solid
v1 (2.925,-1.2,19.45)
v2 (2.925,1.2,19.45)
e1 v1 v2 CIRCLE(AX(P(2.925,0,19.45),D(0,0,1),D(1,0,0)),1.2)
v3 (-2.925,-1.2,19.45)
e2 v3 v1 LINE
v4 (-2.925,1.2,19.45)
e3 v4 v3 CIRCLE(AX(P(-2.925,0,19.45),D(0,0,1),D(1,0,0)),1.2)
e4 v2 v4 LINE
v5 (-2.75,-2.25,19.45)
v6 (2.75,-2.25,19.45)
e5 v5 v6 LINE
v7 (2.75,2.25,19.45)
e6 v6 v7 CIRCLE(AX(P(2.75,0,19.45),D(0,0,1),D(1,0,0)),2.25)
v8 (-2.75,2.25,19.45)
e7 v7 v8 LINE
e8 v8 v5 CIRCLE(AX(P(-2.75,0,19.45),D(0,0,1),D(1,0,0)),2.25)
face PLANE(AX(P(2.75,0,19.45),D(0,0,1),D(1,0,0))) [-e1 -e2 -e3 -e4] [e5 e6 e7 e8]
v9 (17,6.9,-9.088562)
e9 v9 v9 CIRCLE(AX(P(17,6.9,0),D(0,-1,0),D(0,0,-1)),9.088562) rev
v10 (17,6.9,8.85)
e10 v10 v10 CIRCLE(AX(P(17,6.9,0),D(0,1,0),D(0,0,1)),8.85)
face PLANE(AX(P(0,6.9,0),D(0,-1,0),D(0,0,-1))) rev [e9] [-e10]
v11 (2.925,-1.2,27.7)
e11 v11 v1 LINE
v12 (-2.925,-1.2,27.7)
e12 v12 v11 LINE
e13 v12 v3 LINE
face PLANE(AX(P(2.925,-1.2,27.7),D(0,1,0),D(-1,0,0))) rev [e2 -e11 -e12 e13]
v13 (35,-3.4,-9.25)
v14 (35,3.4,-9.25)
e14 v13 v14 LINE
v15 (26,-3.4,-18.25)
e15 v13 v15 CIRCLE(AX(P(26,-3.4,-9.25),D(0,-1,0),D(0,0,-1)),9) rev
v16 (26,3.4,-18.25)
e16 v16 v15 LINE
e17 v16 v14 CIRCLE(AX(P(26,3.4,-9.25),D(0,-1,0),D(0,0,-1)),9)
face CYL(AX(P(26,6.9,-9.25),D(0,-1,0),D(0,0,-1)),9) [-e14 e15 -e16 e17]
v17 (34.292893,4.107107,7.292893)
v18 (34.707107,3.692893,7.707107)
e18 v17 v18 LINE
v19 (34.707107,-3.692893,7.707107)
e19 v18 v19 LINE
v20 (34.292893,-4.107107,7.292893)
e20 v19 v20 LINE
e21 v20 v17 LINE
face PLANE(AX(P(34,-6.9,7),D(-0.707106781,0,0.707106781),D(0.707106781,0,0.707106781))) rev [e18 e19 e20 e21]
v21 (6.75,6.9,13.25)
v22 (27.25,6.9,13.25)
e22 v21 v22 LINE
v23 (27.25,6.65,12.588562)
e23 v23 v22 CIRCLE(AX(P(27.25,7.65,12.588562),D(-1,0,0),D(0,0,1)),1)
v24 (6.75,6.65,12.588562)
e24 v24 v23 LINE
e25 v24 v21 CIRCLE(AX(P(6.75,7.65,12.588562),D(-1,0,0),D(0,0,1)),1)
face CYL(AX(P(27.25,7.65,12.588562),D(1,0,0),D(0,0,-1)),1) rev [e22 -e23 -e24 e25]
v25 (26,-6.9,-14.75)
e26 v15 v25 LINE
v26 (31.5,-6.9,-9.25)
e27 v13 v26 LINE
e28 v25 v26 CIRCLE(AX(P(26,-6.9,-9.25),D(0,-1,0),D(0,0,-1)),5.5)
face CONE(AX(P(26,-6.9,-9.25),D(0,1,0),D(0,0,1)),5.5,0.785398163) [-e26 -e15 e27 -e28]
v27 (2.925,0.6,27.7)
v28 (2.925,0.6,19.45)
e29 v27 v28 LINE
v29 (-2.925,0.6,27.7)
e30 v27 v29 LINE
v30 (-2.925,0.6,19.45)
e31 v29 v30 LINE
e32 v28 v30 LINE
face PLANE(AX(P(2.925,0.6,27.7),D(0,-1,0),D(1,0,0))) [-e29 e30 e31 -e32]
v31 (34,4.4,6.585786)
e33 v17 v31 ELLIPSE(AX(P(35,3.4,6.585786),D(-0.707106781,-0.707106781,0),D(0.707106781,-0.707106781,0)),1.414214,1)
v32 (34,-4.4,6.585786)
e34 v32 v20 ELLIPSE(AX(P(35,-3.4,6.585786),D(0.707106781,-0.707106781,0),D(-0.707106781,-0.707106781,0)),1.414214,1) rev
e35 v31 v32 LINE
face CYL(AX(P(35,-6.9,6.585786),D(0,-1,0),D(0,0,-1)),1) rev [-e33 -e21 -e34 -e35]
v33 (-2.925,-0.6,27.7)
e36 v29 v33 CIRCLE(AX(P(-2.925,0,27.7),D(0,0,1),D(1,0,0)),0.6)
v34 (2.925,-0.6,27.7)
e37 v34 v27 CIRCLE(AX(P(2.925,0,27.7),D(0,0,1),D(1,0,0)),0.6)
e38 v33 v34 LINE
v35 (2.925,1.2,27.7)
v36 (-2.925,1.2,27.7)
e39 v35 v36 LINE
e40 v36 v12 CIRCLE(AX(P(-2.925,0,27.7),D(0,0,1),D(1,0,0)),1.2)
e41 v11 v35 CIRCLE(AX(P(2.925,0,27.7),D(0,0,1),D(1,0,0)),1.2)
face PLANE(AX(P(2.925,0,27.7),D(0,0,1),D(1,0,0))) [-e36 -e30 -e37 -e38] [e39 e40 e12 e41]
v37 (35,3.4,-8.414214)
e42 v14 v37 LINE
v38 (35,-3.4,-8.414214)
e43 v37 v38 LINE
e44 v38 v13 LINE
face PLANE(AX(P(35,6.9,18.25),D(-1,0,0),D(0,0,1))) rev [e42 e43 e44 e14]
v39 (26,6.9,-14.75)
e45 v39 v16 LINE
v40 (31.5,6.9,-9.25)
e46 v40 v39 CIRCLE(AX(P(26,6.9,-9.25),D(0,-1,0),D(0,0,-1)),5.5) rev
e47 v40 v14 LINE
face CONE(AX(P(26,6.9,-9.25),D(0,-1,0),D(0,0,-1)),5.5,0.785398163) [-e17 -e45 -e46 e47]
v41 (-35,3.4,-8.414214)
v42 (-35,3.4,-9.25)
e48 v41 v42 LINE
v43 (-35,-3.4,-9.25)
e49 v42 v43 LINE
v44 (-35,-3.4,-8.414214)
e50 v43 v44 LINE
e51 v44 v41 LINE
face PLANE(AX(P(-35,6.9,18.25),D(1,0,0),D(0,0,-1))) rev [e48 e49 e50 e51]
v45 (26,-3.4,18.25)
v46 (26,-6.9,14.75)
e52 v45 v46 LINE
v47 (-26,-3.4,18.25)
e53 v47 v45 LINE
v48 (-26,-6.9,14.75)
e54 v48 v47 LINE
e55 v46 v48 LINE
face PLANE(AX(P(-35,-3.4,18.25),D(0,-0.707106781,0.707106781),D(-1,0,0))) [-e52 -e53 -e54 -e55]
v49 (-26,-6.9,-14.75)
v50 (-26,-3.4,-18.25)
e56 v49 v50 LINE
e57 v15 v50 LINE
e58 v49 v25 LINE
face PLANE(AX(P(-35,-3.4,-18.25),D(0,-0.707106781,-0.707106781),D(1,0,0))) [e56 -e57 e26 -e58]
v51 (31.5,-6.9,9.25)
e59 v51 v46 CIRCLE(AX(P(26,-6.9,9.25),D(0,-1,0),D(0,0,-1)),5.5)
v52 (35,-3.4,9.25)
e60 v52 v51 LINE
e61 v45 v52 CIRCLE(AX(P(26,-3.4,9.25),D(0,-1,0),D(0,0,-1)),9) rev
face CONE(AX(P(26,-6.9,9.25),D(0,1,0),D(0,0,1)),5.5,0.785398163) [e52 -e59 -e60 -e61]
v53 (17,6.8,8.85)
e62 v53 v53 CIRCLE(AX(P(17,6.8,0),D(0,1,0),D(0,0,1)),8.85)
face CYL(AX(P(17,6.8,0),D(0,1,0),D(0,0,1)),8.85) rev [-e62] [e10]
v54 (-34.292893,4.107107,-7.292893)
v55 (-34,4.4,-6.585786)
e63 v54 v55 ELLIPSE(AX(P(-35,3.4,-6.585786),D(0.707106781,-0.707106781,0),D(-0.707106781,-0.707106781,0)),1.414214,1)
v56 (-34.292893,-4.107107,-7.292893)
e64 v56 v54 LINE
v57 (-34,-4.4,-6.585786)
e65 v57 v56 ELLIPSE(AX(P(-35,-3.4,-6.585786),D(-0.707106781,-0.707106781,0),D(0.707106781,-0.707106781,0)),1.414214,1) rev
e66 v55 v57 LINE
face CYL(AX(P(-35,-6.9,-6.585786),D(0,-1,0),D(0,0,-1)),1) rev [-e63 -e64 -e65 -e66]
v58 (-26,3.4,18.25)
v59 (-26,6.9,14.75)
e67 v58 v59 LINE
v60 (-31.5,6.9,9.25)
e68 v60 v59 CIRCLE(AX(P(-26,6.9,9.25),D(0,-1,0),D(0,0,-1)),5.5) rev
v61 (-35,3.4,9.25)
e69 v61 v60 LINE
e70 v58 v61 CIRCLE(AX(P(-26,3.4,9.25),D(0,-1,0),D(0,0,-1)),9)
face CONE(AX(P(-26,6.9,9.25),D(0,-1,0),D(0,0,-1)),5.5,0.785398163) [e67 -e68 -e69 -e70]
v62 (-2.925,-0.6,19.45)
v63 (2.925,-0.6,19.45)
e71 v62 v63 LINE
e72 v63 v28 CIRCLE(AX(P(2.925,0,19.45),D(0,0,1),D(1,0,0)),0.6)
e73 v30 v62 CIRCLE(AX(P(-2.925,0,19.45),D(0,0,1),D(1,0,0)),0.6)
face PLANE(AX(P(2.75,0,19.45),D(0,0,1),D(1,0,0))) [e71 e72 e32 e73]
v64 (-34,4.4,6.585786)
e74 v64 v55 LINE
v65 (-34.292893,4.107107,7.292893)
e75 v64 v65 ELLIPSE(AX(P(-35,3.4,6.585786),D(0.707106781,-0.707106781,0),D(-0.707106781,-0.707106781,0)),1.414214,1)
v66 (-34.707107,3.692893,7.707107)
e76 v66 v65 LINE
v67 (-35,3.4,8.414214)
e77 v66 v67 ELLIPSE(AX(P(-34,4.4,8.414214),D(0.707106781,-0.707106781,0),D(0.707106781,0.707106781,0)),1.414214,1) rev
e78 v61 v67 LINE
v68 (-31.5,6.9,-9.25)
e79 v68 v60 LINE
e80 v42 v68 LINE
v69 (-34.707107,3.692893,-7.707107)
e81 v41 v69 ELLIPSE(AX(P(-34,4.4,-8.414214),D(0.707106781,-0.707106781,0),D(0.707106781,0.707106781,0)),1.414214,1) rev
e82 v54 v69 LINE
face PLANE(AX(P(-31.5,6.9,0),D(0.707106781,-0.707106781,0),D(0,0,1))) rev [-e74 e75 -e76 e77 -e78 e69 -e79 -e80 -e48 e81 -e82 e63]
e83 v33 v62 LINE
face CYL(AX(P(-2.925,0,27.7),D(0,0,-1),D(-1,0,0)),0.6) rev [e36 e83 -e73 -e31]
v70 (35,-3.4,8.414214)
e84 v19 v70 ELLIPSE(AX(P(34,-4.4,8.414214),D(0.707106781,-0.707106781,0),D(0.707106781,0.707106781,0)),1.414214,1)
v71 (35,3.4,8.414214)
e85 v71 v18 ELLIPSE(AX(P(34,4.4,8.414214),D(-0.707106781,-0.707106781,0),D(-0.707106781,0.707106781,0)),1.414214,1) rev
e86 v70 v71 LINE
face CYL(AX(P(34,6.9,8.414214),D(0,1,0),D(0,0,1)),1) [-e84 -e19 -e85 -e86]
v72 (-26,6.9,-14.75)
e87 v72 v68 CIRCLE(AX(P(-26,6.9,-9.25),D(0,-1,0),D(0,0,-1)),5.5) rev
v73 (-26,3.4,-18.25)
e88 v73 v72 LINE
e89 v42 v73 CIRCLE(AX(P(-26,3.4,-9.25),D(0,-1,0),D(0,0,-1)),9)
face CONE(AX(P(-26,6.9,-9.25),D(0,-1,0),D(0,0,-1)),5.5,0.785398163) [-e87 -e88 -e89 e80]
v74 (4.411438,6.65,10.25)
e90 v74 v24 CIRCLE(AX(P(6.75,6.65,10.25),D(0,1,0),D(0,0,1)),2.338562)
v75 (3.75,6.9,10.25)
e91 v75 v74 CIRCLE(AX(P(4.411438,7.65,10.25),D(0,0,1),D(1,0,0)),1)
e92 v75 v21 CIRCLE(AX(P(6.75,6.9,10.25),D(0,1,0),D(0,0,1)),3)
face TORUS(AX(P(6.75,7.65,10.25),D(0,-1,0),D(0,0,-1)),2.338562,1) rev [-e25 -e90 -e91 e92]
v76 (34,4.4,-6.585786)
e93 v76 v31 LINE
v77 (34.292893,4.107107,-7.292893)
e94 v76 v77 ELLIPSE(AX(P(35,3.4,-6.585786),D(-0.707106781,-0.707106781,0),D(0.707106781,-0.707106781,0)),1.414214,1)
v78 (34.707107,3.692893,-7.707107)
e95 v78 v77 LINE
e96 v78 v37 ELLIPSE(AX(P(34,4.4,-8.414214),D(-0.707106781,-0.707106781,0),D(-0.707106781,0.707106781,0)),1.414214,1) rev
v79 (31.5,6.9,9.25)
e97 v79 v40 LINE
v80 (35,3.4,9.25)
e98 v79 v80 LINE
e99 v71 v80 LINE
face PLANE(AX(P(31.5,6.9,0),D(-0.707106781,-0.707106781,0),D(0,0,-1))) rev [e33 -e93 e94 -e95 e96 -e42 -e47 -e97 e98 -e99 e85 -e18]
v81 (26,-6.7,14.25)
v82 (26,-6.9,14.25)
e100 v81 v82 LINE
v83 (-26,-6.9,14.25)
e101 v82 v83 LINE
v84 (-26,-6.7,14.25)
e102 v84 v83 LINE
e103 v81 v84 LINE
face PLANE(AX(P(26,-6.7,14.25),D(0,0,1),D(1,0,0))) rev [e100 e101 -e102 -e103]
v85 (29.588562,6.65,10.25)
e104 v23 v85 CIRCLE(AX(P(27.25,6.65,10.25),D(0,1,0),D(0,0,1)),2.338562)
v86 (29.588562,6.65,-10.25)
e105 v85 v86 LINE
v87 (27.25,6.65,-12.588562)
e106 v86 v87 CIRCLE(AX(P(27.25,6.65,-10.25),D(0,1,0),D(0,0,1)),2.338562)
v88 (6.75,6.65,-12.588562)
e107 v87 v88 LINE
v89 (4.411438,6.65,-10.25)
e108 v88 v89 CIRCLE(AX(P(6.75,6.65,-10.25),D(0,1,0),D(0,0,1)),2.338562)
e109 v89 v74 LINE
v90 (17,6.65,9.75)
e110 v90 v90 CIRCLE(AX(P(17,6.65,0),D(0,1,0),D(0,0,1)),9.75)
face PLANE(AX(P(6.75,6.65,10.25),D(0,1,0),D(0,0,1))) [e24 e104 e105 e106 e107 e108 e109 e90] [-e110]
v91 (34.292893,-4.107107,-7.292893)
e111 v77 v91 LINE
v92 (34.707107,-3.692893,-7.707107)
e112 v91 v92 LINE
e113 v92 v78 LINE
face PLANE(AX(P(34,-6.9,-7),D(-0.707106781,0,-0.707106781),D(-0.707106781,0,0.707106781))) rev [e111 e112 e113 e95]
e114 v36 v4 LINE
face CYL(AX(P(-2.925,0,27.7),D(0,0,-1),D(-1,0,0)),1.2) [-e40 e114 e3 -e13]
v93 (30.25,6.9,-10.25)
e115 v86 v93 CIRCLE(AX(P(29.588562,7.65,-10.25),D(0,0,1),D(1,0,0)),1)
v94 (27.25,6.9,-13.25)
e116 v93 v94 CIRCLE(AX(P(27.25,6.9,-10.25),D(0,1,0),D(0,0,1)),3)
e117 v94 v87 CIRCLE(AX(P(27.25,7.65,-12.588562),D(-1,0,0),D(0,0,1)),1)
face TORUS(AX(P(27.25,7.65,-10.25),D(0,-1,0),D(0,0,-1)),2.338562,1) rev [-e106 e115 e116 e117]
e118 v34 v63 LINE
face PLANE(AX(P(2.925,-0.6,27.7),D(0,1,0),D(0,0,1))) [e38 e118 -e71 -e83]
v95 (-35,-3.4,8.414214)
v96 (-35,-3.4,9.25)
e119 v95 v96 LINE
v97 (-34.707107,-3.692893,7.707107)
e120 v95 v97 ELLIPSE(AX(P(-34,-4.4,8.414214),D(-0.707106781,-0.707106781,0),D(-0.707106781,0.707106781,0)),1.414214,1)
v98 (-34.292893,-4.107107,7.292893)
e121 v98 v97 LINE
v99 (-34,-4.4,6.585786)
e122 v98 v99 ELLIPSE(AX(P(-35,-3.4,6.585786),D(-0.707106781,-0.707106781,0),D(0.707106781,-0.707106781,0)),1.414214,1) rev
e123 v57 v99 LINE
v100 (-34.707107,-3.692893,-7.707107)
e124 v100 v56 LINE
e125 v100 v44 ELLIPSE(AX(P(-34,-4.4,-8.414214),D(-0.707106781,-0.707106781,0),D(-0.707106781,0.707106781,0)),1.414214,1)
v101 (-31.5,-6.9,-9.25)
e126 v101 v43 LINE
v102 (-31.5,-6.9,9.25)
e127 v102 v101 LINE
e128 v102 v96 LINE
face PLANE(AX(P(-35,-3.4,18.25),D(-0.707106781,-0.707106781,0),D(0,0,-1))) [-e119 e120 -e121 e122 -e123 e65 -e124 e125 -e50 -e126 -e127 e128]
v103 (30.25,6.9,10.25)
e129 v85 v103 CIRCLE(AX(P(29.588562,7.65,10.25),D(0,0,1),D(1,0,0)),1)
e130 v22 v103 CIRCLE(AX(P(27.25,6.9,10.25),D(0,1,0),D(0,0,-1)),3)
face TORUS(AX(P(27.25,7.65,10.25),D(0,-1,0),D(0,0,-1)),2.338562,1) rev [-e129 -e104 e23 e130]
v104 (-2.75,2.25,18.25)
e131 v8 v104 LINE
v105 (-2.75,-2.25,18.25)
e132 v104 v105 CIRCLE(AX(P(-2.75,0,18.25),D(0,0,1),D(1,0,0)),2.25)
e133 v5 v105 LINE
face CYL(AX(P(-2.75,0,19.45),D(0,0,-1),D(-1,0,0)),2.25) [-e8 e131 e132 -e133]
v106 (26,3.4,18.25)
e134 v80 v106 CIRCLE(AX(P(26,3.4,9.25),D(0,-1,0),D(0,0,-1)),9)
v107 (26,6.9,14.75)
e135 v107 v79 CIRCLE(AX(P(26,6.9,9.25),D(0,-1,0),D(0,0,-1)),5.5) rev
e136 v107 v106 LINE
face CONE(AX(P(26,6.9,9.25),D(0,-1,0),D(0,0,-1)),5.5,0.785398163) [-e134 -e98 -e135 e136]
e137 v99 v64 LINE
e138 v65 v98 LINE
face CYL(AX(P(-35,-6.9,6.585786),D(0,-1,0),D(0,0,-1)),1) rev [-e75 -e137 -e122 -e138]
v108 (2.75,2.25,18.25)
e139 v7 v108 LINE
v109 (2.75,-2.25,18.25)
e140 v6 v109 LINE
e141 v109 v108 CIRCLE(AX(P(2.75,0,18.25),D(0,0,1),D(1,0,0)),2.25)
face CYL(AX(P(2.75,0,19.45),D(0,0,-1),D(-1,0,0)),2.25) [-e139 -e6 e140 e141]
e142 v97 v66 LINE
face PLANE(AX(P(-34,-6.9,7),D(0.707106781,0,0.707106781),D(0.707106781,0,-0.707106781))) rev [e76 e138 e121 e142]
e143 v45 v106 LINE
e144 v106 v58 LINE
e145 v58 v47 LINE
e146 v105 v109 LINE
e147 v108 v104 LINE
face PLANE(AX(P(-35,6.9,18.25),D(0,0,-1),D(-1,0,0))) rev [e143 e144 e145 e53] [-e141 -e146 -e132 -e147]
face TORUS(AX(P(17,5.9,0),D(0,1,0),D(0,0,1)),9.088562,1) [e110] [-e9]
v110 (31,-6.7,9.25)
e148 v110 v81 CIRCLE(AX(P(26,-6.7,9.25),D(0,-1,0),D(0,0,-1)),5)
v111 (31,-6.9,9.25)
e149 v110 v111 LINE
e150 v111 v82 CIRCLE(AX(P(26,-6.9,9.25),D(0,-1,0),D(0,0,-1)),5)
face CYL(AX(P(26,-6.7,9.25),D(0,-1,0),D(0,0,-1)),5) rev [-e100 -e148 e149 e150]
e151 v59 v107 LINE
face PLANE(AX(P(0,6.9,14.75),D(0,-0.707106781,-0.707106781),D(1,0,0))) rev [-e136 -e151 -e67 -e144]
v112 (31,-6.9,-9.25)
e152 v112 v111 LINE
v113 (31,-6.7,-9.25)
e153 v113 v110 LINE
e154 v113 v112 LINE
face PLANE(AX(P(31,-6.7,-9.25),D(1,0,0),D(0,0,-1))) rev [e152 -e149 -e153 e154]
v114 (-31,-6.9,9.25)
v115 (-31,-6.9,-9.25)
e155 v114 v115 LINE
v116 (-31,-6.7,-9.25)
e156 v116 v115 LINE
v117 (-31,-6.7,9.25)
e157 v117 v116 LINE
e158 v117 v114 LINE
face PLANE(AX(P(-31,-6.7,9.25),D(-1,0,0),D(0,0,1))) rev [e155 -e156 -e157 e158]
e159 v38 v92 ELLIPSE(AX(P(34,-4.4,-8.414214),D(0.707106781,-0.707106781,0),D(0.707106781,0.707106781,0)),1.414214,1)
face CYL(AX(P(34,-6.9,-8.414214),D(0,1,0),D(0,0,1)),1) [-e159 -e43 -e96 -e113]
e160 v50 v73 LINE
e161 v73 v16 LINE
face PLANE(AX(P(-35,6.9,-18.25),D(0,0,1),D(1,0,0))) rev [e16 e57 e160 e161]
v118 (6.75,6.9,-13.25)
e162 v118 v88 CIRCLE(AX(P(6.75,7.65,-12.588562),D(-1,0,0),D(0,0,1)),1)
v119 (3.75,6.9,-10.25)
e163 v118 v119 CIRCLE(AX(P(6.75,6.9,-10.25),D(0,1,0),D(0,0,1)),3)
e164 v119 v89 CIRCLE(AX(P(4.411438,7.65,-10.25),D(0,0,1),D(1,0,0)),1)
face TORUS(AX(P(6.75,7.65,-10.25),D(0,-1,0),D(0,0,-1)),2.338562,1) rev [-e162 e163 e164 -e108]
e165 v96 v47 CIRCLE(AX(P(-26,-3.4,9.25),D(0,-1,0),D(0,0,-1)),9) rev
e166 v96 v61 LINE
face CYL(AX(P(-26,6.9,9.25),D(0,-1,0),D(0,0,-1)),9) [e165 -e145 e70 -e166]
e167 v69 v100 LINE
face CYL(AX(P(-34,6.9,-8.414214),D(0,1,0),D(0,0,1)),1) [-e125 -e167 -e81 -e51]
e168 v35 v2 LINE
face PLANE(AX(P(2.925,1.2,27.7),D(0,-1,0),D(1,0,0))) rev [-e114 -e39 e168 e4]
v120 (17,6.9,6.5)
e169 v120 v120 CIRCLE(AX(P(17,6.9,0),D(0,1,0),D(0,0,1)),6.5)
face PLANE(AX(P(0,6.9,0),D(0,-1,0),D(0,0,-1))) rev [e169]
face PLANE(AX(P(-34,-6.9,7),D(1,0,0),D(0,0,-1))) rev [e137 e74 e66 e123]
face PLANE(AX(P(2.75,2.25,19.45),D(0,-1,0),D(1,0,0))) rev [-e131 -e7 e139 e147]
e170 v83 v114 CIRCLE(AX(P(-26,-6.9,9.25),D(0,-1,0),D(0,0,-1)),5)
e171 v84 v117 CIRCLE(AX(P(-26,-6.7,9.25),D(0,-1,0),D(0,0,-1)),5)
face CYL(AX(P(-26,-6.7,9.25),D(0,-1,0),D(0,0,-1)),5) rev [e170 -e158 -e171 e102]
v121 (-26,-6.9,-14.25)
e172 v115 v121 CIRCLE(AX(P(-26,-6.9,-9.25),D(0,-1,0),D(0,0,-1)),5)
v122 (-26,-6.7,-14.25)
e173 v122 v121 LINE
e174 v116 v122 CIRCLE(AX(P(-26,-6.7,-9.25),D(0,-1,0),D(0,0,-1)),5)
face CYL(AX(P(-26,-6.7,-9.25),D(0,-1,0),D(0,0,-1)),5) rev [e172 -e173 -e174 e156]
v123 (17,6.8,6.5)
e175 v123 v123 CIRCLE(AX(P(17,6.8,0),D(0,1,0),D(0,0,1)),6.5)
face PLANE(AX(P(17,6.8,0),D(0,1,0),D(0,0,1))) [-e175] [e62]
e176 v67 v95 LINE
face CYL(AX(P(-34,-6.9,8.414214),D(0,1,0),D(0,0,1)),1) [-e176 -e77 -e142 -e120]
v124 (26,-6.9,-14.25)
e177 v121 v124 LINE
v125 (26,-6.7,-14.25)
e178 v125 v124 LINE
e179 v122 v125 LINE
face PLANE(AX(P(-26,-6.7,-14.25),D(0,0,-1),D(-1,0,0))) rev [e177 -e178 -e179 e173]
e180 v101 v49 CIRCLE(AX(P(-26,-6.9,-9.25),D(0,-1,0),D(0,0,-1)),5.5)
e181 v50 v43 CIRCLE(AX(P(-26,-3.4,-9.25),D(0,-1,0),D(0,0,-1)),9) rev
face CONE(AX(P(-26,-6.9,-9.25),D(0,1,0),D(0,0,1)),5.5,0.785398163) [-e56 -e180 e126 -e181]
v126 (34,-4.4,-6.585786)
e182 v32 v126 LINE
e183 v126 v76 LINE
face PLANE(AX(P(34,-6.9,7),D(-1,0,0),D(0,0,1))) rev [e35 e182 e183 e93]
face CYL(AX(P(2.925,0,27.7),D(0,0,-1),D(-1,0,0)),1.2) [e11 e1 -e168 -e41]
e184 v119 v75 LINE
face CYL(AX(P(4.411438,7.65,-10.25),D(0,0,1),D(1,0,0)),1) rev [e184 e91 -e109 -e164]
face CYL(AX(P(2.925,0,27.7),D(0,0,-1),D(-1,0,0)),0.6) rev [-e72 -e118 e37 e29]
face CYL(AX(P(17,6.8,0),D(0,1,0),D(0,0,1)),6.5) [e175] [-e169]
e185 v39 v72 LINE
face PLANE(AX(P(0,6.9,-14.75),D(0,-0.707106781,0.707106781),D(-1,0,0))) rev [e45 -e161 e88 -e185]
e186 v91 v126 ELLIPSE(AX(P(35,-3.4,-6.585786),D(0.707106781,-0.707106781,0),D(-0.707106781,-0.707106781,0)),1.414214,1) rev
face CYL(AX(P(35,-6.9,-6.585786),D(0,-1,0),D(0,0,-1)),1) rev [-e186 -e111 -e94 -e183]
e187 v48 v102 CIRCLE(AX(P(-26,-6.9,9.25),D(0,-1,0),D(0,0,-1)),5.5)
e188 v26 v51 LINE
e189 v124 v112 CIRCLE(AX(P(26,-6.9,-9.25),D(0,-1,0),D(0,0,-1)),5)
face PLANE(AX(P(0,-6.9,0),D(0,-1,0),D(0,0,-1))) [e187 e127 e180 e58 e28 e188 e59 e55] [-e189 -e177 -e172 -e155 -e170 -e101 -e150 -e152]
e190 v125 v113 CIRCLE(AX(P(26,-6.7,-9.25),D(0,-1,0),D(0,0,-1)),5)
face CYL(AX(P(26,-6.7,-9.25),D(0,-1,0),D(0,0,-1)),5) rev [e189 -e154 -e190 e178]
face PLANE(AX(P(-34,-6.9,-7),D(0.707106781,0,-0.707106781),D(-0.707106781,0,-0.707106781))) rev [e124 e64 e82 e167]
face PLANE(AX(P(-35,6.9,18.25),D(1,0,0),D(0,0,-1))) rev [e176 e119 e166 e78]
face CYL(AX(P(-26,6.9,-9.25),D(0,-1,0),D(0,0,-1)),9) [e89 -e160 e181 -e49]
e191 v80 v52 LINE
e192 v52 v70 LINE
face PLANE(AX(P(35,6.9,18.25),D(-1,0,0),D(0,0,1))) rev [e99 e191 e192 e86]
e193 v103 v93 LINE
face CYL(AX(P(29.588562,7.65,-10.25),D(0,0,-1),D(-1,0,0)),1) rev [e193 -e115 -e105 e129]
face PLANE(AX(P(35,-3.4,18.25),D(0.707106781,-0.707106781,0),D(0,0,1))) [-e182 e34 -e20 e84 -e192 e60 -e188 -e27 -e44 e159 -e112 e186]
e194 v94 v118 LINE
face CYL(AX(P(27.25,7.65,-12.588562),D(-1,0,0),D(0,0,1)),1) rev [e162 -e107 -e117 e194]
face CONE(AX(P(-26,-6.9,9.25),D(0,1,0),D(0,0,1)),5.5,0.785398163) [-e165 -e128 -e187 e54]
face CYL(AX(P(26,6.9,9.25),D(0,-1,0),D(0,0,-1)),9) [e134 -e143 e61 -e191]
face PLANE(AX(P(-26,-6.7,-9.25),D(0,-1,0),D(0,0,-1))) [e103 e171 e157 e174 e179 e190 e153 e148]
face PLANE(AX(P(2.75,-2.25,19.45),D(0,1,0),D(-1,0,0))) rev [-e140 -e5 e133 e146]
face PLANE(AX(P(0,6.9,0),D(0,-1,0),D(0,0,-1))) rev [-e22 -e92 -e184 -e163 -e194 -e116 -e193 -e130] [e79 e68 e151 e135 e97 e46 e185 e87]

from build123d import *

# Parameters (mm, degrees)
SKETCH1_W               = 70
SKETCH1_H               = 36.5
BOSS_EXTRUDE1_DEPTH     = 6.9
BOSS_EXTRUDE2_DEPTH     = 1.2
BOSS_EXTRUDE3_DEPTH     = 8.25
FILLET1_R               = 9
SKETCH4_R               = 9.75
CUT_EXTRUDE1_DEPTH      = 0.25
SKETCH5_R               = 8.85
SKETCH5_R_2             = 6.5
CUT_EXTRUDE2_DEPTH      = 0.1
CHAMFER1_SIZE           = 3.5
CUT_EXTRUDE3_DEPTH      = 0.2
CUT_EXTRUDE4_DEPTH      = 46.16525213
CUT_EXTRUDE4_DEPTH_BACK = 46.16525213
FILLET2_R               = 1
FILLET3_R               = 1


with BuildPart() as part:
    # Sketch1 → Boss-Extrude1 (new, symmetric)
    with BuildSketch(Plane(origin=(0, 0, 0), x_dir=(1, 0, 0), z_dir=(0, 1, 0))):
        Rectangle(SKETCH1_W, SKETCH1_H)
    extrude(amount=BOSS_EXTRUDE1_DEPTH, both=True)

    # Sketch2 → Boss-Extrude2 (add)
    with BuildSketch(Plane.XY.offset(18.25)):
        with BuildLine():
            Line((2.75, -2.25), (-2.75, -2.25))
            ThreePointArc((-2.75, -2.25), (-5, 0), (-2.75, 2.25))
            Line((-2.75, 2.25), (2.75, 2.25))
            ThreePointArc((2.75, 2.25), (5, 0), (2.75, -2.25))
        make_face()
    extrude(amount=BOSS_EXTRUDE2_DEPTH)

    # Sketch3 → Boss-Extrude3 (add)
    with BuildSketch(Plane.XY.offset(19.45)):
        with BuildLine():
            Line((2.925, -1.2), (-2.925, -1.2))
            ThreePointArc((-2.925, -1.2), (-4.125, 0), (-2.925, 1.2))
            Line((-2.925, 1.2), (2.925, 1.2))
            ThreePointArc((2.925, 1.2), (4.125, 0), (2.925, -1.2))
        make_face()
        with BuildLine():
            Line((2.925, -0.6), (-2.925, -0.6))
            ThreePointArc((-2.925, -0.6), (-3.525, 0), (-2.925, 0.6))
            Line((-2.925, 0.6), (2.925, 0.6))
            ThreePointArc((2.925, 0.6), (3.525, 0), (2.925, -0.6))
        make_face(mode=Mode.SUBTRACT)
    extrude(amount=BOSS_EXTRUDE3_DEPTH)

    # Fillet1
    fillet1_edges = [part.edges().sort_by_distance(p)[0] for p in [
        (35, 0, 18.25),
        (-35, 0, 18.25),
        (-35, 0, -18.25),
        (35, 0, -18.25),
    ]]
    fillet(fillet1_edges, radius=FILLET1_R)

    # Sketch4 → Cut-Extrude1 (cut)
    with BuildSketch(Plane(origin=(0, 6.9, 0), x_dir=(1, 0, 0), z_dir=(0, 1, 0))):
        with BuildLine():
            Line((27.25, 13.25), (6.75, 13.25))
            ThreePointArc((6.75, 13.25), (4.628679656, 12.371320344), (3.75, 10.25))
            Line((3.75, 10.25), (3.75, -10.25))
            ThreePointArc((3.75, -10.25), (4.628679656, -12.371320344), (6.75, -13.25))
            Line((6.75, -13.25), (27.25, -13.25))
            ThreePointArc((27.25, -13.25), (29.371320344, -12.371320344), (30.25, -10.25))
            Line((30.25, -10.25), (30.25, 10.25))
            ThreePointArc((30.25, 10.25), (29.371320344, 12.371320344), (27.25, 13.25))
        make_face()
        with Locations(Location((17, 0, 0), (0, 0, 270))):
            Circle(SKETCH4_R, mode=Mode.SUBTRACT)
    extrude(amount=-CUT_EXTRUDE1_DEPTH, mode=Mode.SUBTRACT)

    # Sketch5 → Cut-Extrude2 (cut)
    with BuildSketch(Plane(origin=(0, 6.9, 0), x_dir=(1, 0, 0), z_dir=(0, 1, 0))):
        with Locations(Location((17, 0, 0), (0, 0, 270))):
            Circle(SKETCH5_R)
        with Locations(Location((17, 0, 0), (0, 0, 270))):
            Circle(SKETCH5_R_2, mode=Mode.SUBTRACT)
    extrude(amount=-CUT_EXTRUDE2_DEPTH, mode=Mode.SUBTRACT)

    # Chamfer1
    chamfer1_edges = [part.edges().sort_by_distance(p)[0] for p in [
        (0, -6.9, -18.25),
        (0, 6.9, -18.25),
        (35, -6.9, 0),
        (0, -6.9, 18.25),
        (-35, -6.9, 0),
        (-32.363961031, -6.9, 15.613961031),
        (-32.363961031, -6.9, -15.613961031),
        (32.363961031, -6.9, 15.613961031),
        (32.363961031, -6.9, -15.613961031),
        (35, 6.9, 0),
        (-35, 6.9, 0),
        (0, 6.9, 18.25),
        (-32.363961031, 6.9, 15.613961031),
        (-32.363961031, 6.9, -15.613961031),
        (32.363961031, 6.9, 15.613961031),
        (32.363961031, 6.9, -15.613961031),
    ]]
    chamfer(chamfer1_edges, length=CHAMFER1_SIZE)

    # Sketch6 → Cut-Extrude3 (cut)
    with BuildSketch(Plane.XZ.offset(6.9)):
        with BuildLine():
            Line((-26, -14.25), (26, -14.25))
            ThreePointArc((26, -14.25), (29.535533906, -12.785533906), (31, -9.25))
            Line((31, -9.25), (31, 9.25))
            ThreePointArc((31, 9.25), (29.535533906, 12.785533906), (26, 14.25))
            Line((26, 14.25), (-26, 14.25))
            ThreePointArc((-26, 14.25), (-29.535533906, 12.785533906), (-31, 9.25))
            Line((-31, 9.25), (-31, -9.25))
            ThreePointArc((-31, -9.25), (-29.535533906, -12.785533906), (-26, -14.25))
        make_face()
    extrude(amount=-CUT_EXTRUDE3_DEPTH, mode=Mode.SUBTRACT)

    # Sketch7 → Cut-Extrude4 (cut, two sides: drawn at the far end of the back side and taken through both)
    with BuildSketch(Plane(origin=(0, 0, 0), x_dir=(1, 0, 0), z_dir=(0, 1, 0)).offset(-CUT_EXTRUDE4_DEPTH_BACK)):
        Polygon((-34, -7), (-34, 7), (-35, 8), (-35, -8), align=None)
        Polygon((34, 7), (35, 8), (35, -8), (34, -7), align=None)
    extrude(amount=CUT_EXTRUDE4_DEPTH + CUT_EXTRUDE4_DEPTH_BACK, mode=Mode.SUBTRACT)

    # Fillet2
    fillet2_edges = [part.edges().sort_by_distance(p)[0] for p in [
        (34, 0, 7),
        (34, 0, -7),
        (35, 0, -8),
        (35, 0, 8),
        (-35, 0, -8),
        (-34, 0, -7),
        (-34, 0, 7),
        (-35, 0, 8),
    ]]
    fillet(fillet2_edges, radius=FILLET2_R)

    # Fillet3
    # the kernel refuses this fillet: 1 mm, written as the material it adds along each edge
    with BuildSketch(Plane(origin=(27.25, 6.65, -10.25), x_dir=(1, 0, 0), z_dir=(0, 0, 1))) as fillet3_piece_1:
        with BuildLine():
            CenterArc((2.338562172, 1), FILLET3_R, 270, 41.409622109)
            Line((2.338562172, 0), (2.338562172, -0.02))
            Line((2.338562172, -0.02), (3, -0.02))
            Line((3, -0.02), (3.02, 0))
            ThreePointArc((3.02, 0), (3.02, 0.125), (3.013228757, 0.235))
            Line((3.013228757, 0.235), (3, 0.25))
        make_face()
    revolve(axis=Axis((27.25, 6.65, -10.25), (0, 1, 0)), revolution_arc=90)
    with BuildSketch(Plane(origin=(30.25, 6.65, 10.25), x_dir=(0, 1, 0), z_dir=(0, 0, -1)), Plane(origin=(6.75, 6.65, 13.25), x_dir=(0, 1, 0), z_dir=(1, 0, 0)), Plane(origin=(3.75, 6.65, -10.25), x_dir=(0, 1, 0), z_dir=(0, 0, 1)), Plane(origin=(27.25, 6.65, -13.25), x_dir=(0, 1, 0), z_dir=(-1, 0, 0))) as fillet3_piece_2:
        with BuildLine():
            CenterArc((1, -0.661437828), FILLET3_R, 138.590377891, 41.409622109)
            Line((0, -0.661437828), (-0.02, -0.661437828))
            Line((-0.02, -0.661437828), (-0.02, 0))
            Line((-0.02, 0), (0, 0.02))
            ThreePointArc((0, 0.02), (0.125, 0.02), (0.235, 0.013228757))
            Line((0.235, 0.013228757), (0.25, 0))
        make_face()
    extrude(amount=20.5)
    with BuildSketch(Plane(origin=(27.25, 6.65, 10.25), x_dir=(0, 0, 1), z_dir=(-1, 0, 0))) as fillet3_piece_3:
        with BuildLine():
            CenterArc((2.338562172, 1), FILLET3_R, 270, 41.409622109)
            Line((2.338562172, 0), (2.338562172, -0.02))
            Line((2.338562172, -0.02), (3, -0.02))
            Line((3, -0.02), (3.02, 0))
            ThreePointArc((3.02, 0), (3.02, 0.125), (3.013228757, 0.235))
            Line((3.013228757, 0.235), (3, 0.25))
        make_face()
    revolve(axis=Axis((27.25, 6.65, 10.25), (0, 1, 0)), revolution_arc=90)
    with BuildSketch(Plane(origin=(6.75, 6.65, 10.25), x_dir=(-1, 0, 0), z_dir=(0, 0, -1))) as fillet3_piece_4:
        with BuildLine():
            CenterArc((2.338562172, 1), FILLET3_R, 270, 41.409622109)
            Line((2.338562172, 0), (2.338562172, -0.02))
            Line((2.338562172, -0.02), (3, -0.02))
            Line((3, -0.02), (3.02, 0))
            ThreePointArc((3.02, 0), (3.02, 0.125), (3.013228757, 0.235))
            Line((3.013228757, 0.235), (3, 0.25))
        make_face()
    revolve(axis=Axis((6.75, 6.65, 10.25), (0, 1, 0)), revolution_arc=90)
    with BuildSketch(Plane(origin=(6.75, 6.65, -10.25), x_dir=(0, 0, -1), z_dir=(1, 0, 0))) as fillet3_piece_5:
        with BuildLine():
            CenterArc((2.338562172, 1), FILLET3_R, 270, 41.409622109)
            Line((2.338562172, 0), (2.338562172, -0.02))
            Line((2.338562172, -0.02), (3, -0.02))
            Line((3, -0.02), (3.02, 0))
            ThreePointArc((3.02, 0), (3.02, 0.125), (3.013228757, 0.235))
            Line((3.013228757, 0.235), (3, 0.25))
        make_face()
    revolve(axis=Axis((6.75, 6.65, -10.25), (0, 1, 0)), revolution_arc=90)
    # the kernel refuses this fillet: 1 mm, written as the material it takes off along each edge
    with BuildSketch(Plane(origin=(17, 6.9, 0), x_dir=(0, 0, 1), z_dir=(-1, 0, 0))) as fillet3_2_piece_1:
        with BuildLine():
            CenterArc((9.088562172, -1), FILLET3_R, 48.590377891, 41.409622109)
            Line((9.088562172, 0), (9.088562172, 0.02))
            Line((9.088562172, 0.02), (9.75, 0.02))
            Line((9.75, 0.02), (9.77, 0))
            ThreePointArc((9.77, 0), (9.77, -0.125), (9.763228757, -0.235))
            Line((9.763228757, -0.235), (9.75, -0.25))
        make_face()
    revolve(axis=Axis((17, 6.9, 0), (0, 1, 0)), mode=Mode.SUBTRACT)


solid = part.part
